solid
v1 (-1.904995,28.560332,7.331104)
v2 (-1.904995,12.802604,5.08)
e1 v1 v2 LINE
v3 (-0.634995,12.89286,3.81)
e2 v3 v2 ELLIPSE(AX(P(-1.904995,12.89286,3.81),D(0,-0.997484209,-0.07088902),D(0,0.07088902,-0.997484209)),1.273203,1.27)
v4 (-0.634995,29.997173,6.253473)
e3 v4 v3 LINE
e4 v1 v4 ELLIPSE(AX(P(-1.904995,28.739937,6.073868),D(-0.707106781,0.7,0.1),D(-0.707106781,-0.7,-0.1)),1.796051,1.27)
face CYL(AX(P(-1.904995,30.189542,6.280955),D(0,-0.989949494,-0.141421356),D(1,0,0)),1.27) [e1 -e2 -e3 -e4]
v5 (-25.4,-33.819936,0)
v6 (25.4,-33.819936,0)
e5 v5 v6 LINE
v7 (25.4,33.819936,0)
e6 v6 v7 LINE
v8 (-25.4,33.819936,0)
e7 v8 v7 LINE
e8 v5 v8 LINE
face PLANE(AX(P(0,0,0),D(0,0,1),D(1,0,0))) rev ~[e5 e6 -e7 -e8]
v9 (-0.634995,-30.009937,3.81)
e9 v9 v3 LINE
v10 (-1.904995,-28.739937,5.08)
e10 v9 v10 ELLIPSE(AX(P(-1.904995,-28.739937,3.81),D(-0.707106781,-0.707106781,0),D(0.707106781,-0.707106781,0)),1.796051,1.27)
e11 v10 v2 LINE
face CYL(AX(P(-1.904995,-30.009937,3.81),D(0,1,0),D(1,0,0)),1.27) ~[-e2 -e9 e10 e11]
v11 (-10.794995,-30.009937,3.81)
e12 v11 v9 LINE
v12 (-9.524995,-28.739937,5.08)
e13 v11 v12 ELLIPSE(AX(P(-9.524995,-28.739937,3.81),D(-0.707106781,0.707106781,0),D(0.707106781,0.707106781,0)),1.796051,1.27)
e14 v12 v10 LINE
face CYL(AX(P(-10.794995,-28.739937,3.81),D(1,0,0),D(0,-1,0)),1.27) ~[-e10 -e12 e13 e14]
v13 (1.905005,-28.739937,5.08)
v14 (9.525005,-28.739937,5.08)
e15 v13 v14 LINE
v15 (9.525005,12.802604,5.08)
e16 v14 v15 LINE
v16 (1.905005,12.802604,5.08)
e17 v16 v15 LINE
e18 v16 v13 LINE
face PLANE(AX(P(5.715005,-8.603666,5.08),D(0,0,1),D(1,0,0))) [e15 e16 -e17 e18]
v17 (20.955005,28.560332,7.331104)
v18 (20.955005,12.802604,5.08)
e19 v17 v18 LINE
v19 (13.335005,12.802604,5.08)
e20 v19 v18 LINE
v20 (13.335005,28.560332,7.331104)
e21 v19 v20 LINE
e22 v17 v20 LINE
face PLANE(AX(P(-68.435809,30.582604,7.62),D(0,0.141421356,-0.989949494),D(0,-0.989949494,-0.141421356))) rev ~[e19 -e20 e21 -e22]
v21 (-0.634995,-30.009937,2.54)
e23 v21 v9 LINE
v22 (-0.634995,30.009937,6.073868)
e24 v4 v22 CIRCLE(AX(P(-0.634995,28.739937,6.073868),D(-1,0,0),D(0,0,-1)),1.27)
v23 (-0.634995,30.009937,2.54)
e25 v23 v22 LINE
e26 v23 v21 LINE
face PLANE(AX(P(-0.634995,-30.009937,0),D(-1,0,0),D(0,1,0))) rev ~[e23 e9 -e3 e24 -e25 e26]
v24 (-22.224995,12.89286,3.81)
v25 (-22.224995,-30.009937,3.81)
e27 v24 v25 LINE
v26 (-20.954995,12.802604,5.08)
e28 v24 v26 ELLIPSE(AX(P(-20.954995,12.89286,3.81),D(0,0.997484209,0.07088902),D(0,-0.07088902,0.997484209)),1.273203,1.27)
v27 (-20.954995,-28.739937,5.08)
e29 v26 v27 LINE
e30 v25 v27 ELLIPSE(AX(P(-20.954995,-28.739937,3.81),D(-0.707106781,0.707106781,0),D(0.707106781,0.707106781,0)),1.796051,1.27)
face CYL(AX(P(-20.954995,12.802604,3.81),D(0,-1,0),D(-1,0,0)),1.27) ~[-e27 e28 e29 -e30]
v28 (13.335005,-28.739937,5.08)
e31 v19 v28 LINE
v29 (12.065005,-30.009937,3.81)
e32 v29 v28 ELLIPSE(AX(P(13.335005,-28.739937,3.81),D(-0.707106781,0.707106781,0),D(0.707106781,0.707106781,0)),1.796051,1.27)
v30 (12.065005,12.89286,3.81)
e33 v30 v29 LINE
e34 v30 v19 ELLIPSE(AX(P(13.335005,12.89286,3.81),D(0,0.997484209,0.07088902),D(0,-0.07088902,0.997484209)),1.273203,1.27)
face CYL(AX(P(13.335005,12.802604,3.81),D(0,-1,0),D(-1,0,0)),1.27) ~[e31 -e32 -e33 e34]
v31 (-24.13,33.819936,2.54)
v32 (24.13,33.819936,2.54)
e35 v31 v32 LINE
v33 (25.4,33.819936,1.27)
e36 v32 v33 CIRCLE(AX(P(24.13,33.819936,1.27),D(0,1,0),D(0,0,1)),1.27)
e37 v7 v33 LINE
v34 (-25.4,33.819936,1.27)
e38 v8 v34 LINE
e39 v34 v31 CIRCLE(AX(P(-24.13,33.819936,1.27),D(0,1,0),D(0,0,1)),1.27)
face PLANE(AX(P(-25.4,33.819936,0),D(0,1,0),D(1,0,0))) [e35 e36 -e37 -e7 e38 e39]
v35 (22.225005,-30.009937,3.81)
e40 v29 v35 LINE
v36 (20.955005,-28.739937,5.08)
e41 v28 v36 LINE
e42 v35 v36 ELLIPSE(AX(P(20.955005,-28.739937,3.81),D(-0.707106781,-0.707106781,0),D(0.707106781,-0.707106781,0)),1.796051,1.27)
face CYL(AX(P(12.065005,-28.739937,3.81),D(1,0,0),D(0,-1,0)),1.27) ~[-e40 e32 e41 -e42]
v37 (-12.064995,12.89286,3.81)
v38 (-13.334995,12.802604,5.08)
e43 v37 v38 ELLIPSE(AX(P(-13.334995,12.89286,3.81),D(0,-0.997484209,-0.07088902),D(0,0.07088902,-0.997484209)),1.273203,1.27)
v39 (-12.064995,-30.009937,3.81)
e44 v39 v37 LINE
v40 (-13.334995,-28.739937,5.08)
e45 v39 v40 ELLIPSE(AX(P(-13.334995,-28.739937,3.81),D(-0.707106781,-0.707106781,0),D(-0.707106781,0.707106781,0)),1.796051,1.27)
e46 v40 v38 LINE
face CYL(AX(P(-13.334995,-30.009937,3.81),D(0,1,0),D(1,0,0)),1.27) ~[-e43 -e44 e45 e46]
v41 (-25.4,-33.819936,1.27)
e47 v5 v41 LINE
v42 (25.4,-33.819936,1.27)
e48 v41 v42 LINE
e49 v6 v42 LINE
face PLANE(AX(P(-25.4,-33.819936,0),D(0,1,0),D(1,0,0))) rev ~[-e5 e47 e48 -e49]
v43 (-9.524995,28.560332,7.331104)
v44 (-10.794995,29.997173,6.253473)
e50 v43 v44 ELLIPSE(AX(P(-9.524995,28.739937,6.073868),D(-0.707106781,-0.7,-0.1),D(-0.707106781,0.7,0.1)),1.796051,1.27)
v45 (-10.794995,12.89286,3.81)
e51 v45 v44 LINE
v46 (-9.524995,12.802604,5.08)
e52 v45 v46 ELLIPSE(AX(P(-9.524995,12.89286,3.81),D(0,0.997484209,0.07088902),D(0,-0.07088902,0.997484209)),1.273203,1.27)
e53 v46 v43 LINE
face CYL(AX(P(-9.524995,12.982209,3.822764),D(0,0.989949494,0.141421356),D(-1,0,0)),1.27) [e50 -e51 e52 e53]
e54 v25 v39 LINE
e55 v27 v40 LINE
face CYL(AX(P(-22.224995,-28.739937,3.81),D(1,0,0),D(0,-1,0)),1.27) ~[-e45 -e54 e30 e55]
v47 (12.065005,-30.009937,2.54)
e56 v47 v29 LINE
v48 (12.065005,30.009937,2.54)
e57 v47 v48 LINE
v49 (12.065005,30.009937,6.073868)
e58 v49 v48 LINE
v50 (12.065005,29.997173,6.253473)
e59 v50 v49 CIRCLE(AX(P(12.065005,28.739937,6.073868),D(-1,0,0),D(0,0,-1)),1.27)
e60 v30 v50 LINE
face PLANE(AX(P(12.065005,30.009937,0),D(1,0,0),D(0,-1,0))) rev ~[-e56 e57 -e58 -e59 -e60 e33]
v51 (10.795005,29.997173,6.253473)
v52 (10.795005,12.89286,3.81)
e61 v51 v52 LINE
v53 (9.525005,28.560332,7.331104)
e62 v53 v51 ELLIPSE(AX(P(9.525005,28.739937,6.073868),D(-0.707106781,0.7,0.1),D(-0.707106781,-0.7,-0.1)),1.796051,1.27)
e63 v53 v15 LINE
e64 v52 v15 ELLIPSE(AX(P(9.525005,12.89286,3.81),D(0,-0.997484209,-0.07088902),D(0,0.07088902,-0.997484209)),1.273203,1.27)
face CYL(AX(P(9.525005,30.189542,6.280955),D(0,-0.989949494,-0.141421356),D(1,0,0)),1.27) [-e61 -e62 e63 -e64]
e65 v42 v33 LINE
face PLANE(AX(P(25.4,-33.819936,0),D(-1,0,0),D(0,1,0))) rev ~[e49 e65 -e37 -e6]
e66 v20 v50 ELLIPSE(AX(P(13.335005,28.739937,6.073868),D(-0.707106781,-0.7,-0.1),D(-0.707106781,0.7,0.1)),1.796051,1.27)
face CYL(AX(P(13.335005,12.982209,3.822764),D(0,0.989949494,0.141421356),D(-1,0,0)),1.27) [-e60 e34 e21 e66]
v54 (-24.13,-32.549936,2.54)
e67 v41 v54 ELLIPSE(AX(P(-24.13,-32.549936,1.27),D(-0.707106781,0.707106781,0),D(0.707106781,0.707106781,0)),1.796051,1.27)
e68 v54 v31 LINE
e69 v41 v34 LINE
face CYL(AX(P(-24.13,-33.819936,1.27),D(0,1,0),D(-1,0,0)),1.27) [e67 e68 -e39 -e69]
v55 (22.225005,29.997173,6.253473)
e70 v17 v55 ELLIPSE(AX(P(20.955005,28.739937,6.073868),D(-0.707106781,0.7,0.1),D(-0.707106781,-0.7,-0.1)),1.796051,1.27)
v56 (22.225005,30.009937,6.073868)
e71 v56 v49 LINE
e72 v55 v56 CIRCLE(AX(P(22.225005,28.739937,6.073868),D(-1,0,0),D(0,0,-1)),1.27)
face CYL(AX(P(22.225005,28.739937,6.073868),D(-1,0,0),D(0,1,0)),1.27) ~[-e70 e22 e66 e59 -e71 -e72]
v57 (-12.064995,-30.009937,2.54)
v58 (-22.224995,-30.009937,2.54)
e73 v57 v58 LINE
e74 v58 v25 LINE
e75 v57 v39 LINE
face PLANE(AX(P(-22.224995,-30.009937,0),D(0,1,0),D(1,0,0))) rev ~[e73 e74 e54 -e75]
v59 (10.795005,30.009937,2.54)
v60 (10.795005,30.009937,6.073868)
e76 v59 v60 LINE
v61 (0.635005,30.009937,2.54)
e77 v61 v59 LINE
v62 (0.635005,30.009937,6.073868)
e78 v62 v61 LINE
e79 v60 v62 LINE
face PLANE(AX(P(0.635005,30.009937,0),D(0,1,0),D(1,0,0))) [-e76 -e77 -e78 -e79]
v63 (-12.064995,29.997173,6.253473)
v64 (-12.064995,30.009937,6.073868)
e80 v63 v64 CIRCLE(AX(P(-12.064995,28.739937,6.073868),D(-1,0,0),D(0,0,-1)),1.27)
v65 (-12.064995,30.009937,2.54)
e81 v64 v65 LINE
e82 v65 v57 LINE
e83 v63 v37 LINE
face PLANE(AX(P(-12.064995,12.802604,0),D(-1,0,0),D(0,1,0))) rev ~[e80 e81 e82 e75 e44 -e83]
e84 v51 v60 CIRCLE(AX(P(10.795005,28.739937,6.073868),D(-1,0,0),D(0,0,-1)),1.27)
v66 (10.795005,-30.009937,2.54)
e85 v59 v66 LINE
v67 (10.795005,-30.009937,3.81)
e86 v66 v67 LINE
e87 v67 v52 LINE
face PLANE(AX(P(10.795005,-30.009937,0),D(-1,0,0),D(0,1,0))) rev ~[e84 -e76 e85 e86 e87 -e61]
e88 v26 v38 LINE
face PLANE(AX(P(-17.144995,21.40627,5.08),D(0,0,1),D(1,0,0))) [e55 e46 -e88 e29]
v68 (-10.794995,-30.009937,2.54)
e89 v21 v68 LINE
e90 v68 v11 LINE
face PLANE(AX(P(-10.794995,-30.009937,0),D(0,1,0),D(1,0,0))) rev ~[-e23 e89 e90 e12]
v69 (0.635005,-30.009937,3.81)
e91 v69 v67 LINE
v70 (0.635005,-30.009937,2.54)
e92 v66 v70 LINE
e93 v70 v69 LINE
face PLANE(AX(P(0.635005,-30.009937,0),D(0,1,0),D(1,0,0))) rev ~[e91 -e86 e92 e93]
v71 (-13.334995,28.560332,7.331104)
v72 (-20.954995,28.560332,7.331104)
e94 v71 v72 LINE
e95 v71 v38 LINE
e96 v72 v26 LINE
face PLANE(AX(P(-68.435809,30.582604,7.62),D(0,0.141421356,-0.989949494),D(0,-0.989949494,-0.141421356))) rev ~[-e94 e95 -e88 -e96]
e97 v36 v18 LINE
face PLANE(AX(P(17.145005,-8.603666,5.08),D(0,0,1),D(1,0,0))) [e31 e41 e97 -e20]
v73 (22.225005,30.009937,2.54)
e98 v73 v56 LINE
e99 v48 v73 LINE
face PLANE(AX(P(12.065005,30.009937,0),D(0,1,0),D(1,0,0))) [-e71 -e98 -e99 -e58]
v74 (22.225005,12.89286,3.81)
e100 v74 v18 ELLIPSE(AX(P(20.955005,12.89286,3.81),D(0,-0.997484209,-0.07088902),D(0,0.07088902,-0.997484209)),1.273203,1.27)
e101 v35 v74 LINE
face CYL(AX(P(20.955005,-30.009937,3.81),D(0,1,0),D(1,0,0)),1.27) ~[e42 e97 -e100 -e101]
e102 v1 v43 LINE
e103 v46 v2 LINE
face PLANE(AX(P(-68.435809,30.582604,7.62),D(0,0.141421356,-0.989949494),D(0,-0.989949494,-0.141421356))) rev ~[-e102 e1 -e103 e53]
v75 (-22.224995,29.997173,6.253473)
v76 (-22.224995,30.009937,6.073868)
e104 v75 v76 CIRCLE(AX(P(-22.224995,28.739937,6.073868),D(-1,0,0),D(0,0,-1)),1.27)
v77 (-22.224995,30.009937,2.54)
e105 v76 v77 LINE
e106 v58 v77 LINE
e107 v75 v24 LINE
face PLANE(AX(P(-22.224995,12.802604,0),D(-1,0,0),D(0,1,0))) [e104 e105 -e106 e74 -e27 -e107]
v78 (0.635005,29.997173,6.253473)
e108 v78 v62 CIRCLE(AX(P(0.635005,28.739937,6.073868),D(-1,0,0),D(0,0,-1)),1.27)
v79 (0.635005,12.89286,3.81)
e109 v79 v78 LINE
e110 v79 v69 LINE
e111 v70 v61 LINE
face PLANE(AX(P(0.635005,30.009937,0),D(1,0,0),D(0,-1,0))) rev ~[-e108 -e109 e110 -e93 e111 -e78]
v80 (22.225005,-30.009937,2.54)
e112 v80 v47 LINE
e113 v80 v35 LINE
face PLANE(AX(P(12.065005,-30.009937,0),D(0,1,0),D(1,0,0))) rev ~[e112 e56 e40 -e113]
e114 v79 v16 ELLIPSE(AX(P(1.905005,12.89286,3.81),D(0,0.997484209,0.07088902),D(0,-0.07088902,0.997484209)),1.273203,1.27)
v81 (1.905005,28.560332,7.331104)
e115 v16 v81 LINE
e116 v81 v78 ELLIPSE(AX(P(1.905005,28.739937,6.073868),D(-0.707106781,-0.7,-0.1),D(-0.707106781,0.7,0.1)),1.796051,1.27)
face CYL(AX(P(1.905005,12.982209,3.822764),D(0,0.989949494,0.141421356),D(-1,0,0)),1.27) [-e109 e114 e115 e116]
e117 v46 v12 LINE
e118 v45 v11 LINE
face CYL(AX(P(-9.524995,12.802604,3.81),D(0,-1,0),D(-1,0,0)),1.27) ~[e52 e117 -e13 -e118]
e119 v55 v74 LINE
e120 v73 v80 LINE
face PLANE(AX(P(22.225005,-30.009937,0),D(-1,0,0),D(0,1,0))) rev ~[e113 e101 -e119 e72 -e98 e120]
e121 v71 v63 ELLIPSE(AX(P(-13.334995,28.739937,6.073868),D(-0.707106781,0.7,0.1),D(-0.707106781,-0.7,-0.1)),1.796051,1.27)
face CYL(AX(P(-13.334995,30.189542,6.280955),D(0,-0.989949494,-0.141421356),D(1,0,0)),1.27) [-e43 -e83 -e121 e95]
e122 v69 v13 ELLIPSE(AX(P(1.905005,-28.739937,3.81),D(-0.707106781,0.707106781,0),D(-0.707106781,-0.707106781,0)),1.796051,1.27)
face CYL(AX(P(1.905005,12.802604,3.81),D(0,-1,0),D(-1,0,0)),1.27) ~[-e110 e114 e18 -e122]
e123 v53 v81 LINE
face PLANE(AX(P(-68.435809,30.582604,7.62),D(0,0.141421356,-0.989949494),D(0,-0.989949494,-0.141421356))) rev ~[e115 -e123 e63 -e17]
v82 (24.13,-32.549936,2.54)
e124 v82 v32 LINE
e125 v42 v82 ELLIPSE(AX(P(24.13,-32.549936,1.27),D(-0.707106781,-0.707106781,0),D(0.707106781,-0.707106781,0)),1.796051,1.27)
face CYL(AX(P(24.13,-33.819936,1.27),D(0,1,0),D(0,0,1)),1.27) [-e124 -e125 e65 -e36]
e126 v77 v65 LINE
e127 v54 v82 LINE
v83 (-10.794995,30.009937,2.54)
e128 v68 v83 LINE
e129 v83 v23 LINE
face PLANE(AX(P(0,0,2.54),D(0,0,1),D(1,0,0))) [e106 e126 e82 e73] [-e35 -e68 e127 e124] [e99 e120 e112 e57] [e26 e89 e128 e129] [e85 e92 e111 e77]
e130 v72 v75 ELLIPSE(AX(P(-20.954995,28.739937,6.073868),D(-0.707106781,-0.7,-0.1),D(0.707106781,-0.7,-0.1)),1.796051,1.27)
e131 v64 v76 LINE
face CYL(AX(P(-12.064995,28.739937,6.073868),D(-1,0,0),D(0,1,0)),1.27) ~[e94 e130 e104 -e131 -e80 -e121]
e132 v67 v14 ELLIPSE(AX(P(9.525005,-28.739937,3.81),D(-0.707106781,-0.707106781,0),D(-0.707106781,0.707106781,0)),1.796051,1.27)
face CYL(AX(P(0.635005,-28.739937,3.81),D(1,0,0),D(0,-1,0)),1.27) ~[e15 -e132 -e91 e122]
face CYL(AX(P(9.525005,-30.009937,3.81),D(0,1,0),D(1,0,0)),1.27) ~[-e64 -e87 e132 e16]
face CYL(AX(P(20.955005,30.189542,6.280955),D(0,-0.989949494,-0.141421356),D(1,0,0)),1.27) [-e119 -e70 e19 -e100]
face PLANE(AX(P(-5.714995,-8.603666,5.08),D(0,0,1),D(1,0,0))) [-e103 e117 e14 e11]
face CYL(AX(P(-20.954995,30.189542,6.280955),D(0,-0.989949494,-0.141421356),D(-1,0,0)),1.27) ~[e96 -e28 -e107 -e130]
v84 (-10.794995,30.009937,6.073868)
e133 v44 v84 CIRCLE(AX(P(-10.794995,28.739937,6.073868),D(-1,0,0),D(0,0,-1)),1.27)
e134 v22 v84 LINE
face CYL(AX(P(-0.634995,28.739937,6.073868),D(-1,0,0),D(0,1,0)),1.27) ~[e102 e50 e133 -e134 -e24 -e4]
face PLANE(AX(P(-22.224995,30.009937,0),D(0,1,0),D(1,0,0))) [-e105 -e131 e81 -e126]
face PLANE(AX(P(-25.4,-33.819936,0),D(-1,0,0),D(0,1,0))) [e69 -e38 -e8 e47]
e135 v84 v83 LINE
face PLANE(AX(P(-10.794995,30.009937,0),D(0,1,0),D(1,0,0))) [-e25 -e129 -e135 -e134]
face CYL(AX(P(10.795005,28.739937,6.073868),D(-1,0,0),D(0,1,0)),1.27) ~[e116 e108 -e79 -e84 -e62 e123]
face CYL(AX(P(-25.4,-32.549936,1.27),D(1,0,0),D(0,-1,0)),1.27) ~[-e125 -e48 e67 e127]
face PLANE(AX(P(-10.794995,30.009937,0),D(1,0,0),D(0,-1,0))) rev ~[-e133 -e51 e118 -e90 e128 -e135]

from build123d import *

# Parameters (mm, degrees)
F0_W         = 10.16
F0_H         = 17.20733324
F1_DEPTH     = 7.62
F0_H_2       = 42.8125401959
F2_DEPTH     = 5.08
F0_W_2       = 50.8
F0_H_3       = 67.63987211
F3_DEPTH     = 2.54
F4_T4_DEPTH  = 102.5816286105
F4_T9_DEPTH  = 102.5816286105
F4_T14_DEPTH = 102.5816286105
F4_T19_DEPTH = 102.5816286105
F5_R         = 1.27
F6_R         = 1.27


# Not quite as in the source:
# - a fillet or chamfer that OpenCascade refuses, or shapes differently, is made with other operations: its cross-section is extruded or revolved along the edge and cut away or added
# - two fillets or chamfers of one size are made in one step
# - ends of sketch curves that miss each other by under 0.0002 mm in the source are joined


with BuildPart() as f1:
    # F0 (on Top) → F1 (new body)
    with BuildSketch(Plane.XY):
        with Locations((-17.1449951105, 21.4062702746)):
            Rectangle(F0_W, F0_H)
    extrude(amount=F1_DEPTH)

    # F0 (on Top) → F2 (join)
    with BuildSketch(Plane.XY):
        with Locations((-17.1449951105, 21.4062702746)):
            Rectangle(F0_W, F0_H)
        with Locations((-17.1449951105, -8.6036664434)):
            Rectangle(F0_W, F0_H_2)
    extrude(amount=F2_DEPTH)



with BuildPart() as f1b:
    # F0 (on Top) → F1, piece 2 (new body)
    with BuildSketch(Plane.XY):
        with Locations((-5.7149951105, 21.4062702746)):
            Rectangle(F0_W, F0_H)
    extrude(amount=F1_DEPTH)

    # F0 (on Top) → F2, piece 2 (join)
    with BuildSketch(Plane.XY):
        with Locations((-5.7149951105, -8.6036664434)):
            Rectangle(F0_W, F0_H_2)
        with Locations((-5.7149951105, 21.4062702746)):
            Rectangle(F0_W, F0_H)
    extrude(amount=F2_DEPTH)


with BuildPart() as f1c:
    # F0 (on Top) → F1, piece 3 (new body)
    with BuildSketch(Plane.XY):
        with Locations((5.7150048895, 21.4062702746)):
            Rectangle(F0_W, F0_H)
    extrude(amount=F1_DEPTH)

    # F0 (on Top) → F2, piece 3 (join)
    with BuildSketch(Plane.XY):
        with Locations((5.7150048895, -8.6036664434)):
            Rectangle(F0_W, F0_H_2)
        with Locations((5.7150048895, 21.4062702746)):
            Rectangle(F0_W, F0_H)
    extrude(amount=F2_DEPTH)


with BuildPart() as f1d:
    # F0 (on Top) → F1, piece 4 (new body)
    with BuildSketch(Plane.XY):
        with Locations((17.1450048895, 21.4062702746)):
            Rectangle(F0_W, F0_H)
    extrude(amount=F1_DEPTH)

    # F0 (on Top) → F2, piece 4 (join)
    with BuildSketch(Plane.XY):
        with Locations((17.1450048895, -8.6036664434)):
            Rectangle(F0_W, F0_H_2)
        with Locations((17.1450048895, 21.4062702746)):
            Rectangle(F0_W, F0_H)
    extrude(amount=F2_DEPTH)


with BuildPart() as f1_1:
    add(f1.part)

    add(f1b.part)  # F3 merges F1b

    add(f1c.part)  # F3 merges F1c

    add(f1d.part)  # F3 merges F1d
    # F0 (on Top) → F3 (join)
    with BuildSketch(Plane.XY):
        with Locations((0, -1.609e-07)):
            Rectangle(F0_W_2, F0_H_3)
        Polygon((-22.2249951105, 30.0099368946), (-12.0649951105, 30.0099368946), (-12.0649951105, 12.8026036546), (-12.0649951105, -30.0099365413), (-22.2249951105, -30.0099365413), (-22.2249951105, 12.8026036546), align=None, mode=Mode.SUBTRACT)
        Polygon((-10.7949951105, -30.0099365413), (-10.7949951105, 12.8026036546), (-10.7949951105, 30.0099368946), (-0.6349951105, 30.0099368946), (-0.6349951105, 12.8026036546), (-0.6349951105, -30.0099365413), align=None, mode=Mode.SUBTRACT)
        Polygon((0.6350048895, -30.0099365413), (0.6350048895, 12.8026036546), (0.6350048895, 30.0099368946), (10.7950048895, 30.0099368946), (10.7950048895, 12.8026036546), (10.7950048895, -30.0099365413), align=None, mode=Mode.SUBTRACT)
        Polygon((12.0650048895, -30.0099365413), (12.0650048895, 12.8026036546), (12.0650048895, 30.0099368946), (22.2250048895, 30.0099368946), (22.2250048895, 12.8026036546), (22.2250048895, -30.0099365413), align=None, mode=Mode.SUBTRACT)
    extrude(amount=F3_DEPTH)

    # F4: chamfer of 17.78 x 2.54 on 4 edges, made by hand


with BuildPart() as f4_tool2:
    # F4_s3 → F4_t4 (new body)
    with BuildSketch(Plane.YZ.offset(-68.4358094158)):
        Polygon((30.5826036546, 7.62), (12.8026036546, 5.08), (12.8026036546, 7.62), align=None)
    extrude(amount=F4_T4_DEPTH)

    split(bisect_by=Plane.XY.offset(5.08), keep=Keep.TOP)


with BuildPart() as f1_2:
    add(f1_1.part)

    # F4_t1: cut F4_tool2
    add(f4_tool2.part, mode=Mode.SUBTRACT)


with BuildPart() as f4_tool7:
    # F4_s8 → F4_t9 (new body)
    with BuildSketch(Plane.YZ.offset(-57.0058094158)):
        Polygon((12.8026036546, 5.08), (30.5826036546, 7.62), (12.8026036546, 7.62), align=None)
    extrude(amount=F4_T9_DEPTH)

    split(bisect_by=Plane.XY.offset(5.08), keep=Keep.TOP)


with BuildPart() as f1_3:
    add(f1_2.part)

    # F4_t6: cut F4_tool7
    add(f4_tool7.part, mode=Mode.SUBTRACT)


with BuildPart() as f4_tool12:
    # F4_s13 → F4_t14 (new body)
    with BuildSketch(Plane.YZ.offset(-45.5758094158)):
        Polygon((12.8026036546, 5.08), (30.5826036546, 7.62), (12.8026036546, 7.62), align=None)
    extrude(amount=F4_T14_DEPTH)

    split(bisect_by=Plane.XY.offset(5.08), keep=Keep.TOP)


with BuildPart() as f1_4:
    add(f1_3.part)

    # F4_t11: cut F4_tool12
    add(f4_tool12.part, mode=Mode.SUBTRACT)


with BuildPart() as f4_tool17:
    # F4_s18 → F4_t19 (new body)
    with BuildSketch(Plane.YZ.offset(-34.1458094158)):
        Polygon((12.8026036546, 5.08), (30.5826036546, 7.62), (12.8026036546, 7.62), align=None)
    extrude(amount=F4_T19_DEPTH)

    split(bisect_by=Plane.XY.offset(5.08), keep=Keep.TOP)


with BuildPart() as f1_5:
    add(f1_4.part)

    # F4_t16: cut F4_tool17
    add(f4_tool17.part, mode=Mode.SUBTRACT)

    # F5
    f5_edges = [f1_5.edges().sort_by_distance(p)[0] for p in [
        (0, -33.819936, 2.54),
        (-25.4, 0, 2.54),
        (25.4, 0, 2.54),
    ]]
    fillet(f5_edges, radius=F5_R)

    # F6
    f6_edges = [f1_5.edges().sort_by_distance(p)[0] for p in [
        (-12.064995, -8.603666, 5.08),
        (-17.144995, -30.009937, 5.08),
        (-22.224995, -8.603666, 5.08),
        (-5.714995, -30.009937, 5.08),
        (-10.794995, -8.603666, 5.08),
        (-0.634995, -8.603666, 5.08),
        (0.635005, -8.603666, 5.08),
        (10.795005, -8.603666, 5.08),
        (5.715005, -30.009937, 5.08),
        (17.145005, -30.009937, 5.08),
        (12.065005, -8.603666, 5.08),
        (22.225005, -8.603666, 5.08),
        (-17.144995, 30.009937, 7.53819),
        (-12.064995, 21.40627, 6.309095),
        (-22.224995, 21.40627, 6.309095),
        (-10.794995, 21.40627, 6.309095),
        (-5.714995, 30.009937, 7.53819),
        (-0.634995, 21.40627, 6.309095),
        (0.635005, 21.40627, 6.309095),
        (5.715005, 30.009937, 7.53819),
        (10.795005, 21.40627, 6.309095),
        (12.065005, 21.40627, 6.309095),
        (17.145005, 30.009937, 7.53819),
        (22.225005, 21.40627, 6.309095),
    ]]
    fillet(f6_edges, radius=F6_R)


solid = f1_5.part
